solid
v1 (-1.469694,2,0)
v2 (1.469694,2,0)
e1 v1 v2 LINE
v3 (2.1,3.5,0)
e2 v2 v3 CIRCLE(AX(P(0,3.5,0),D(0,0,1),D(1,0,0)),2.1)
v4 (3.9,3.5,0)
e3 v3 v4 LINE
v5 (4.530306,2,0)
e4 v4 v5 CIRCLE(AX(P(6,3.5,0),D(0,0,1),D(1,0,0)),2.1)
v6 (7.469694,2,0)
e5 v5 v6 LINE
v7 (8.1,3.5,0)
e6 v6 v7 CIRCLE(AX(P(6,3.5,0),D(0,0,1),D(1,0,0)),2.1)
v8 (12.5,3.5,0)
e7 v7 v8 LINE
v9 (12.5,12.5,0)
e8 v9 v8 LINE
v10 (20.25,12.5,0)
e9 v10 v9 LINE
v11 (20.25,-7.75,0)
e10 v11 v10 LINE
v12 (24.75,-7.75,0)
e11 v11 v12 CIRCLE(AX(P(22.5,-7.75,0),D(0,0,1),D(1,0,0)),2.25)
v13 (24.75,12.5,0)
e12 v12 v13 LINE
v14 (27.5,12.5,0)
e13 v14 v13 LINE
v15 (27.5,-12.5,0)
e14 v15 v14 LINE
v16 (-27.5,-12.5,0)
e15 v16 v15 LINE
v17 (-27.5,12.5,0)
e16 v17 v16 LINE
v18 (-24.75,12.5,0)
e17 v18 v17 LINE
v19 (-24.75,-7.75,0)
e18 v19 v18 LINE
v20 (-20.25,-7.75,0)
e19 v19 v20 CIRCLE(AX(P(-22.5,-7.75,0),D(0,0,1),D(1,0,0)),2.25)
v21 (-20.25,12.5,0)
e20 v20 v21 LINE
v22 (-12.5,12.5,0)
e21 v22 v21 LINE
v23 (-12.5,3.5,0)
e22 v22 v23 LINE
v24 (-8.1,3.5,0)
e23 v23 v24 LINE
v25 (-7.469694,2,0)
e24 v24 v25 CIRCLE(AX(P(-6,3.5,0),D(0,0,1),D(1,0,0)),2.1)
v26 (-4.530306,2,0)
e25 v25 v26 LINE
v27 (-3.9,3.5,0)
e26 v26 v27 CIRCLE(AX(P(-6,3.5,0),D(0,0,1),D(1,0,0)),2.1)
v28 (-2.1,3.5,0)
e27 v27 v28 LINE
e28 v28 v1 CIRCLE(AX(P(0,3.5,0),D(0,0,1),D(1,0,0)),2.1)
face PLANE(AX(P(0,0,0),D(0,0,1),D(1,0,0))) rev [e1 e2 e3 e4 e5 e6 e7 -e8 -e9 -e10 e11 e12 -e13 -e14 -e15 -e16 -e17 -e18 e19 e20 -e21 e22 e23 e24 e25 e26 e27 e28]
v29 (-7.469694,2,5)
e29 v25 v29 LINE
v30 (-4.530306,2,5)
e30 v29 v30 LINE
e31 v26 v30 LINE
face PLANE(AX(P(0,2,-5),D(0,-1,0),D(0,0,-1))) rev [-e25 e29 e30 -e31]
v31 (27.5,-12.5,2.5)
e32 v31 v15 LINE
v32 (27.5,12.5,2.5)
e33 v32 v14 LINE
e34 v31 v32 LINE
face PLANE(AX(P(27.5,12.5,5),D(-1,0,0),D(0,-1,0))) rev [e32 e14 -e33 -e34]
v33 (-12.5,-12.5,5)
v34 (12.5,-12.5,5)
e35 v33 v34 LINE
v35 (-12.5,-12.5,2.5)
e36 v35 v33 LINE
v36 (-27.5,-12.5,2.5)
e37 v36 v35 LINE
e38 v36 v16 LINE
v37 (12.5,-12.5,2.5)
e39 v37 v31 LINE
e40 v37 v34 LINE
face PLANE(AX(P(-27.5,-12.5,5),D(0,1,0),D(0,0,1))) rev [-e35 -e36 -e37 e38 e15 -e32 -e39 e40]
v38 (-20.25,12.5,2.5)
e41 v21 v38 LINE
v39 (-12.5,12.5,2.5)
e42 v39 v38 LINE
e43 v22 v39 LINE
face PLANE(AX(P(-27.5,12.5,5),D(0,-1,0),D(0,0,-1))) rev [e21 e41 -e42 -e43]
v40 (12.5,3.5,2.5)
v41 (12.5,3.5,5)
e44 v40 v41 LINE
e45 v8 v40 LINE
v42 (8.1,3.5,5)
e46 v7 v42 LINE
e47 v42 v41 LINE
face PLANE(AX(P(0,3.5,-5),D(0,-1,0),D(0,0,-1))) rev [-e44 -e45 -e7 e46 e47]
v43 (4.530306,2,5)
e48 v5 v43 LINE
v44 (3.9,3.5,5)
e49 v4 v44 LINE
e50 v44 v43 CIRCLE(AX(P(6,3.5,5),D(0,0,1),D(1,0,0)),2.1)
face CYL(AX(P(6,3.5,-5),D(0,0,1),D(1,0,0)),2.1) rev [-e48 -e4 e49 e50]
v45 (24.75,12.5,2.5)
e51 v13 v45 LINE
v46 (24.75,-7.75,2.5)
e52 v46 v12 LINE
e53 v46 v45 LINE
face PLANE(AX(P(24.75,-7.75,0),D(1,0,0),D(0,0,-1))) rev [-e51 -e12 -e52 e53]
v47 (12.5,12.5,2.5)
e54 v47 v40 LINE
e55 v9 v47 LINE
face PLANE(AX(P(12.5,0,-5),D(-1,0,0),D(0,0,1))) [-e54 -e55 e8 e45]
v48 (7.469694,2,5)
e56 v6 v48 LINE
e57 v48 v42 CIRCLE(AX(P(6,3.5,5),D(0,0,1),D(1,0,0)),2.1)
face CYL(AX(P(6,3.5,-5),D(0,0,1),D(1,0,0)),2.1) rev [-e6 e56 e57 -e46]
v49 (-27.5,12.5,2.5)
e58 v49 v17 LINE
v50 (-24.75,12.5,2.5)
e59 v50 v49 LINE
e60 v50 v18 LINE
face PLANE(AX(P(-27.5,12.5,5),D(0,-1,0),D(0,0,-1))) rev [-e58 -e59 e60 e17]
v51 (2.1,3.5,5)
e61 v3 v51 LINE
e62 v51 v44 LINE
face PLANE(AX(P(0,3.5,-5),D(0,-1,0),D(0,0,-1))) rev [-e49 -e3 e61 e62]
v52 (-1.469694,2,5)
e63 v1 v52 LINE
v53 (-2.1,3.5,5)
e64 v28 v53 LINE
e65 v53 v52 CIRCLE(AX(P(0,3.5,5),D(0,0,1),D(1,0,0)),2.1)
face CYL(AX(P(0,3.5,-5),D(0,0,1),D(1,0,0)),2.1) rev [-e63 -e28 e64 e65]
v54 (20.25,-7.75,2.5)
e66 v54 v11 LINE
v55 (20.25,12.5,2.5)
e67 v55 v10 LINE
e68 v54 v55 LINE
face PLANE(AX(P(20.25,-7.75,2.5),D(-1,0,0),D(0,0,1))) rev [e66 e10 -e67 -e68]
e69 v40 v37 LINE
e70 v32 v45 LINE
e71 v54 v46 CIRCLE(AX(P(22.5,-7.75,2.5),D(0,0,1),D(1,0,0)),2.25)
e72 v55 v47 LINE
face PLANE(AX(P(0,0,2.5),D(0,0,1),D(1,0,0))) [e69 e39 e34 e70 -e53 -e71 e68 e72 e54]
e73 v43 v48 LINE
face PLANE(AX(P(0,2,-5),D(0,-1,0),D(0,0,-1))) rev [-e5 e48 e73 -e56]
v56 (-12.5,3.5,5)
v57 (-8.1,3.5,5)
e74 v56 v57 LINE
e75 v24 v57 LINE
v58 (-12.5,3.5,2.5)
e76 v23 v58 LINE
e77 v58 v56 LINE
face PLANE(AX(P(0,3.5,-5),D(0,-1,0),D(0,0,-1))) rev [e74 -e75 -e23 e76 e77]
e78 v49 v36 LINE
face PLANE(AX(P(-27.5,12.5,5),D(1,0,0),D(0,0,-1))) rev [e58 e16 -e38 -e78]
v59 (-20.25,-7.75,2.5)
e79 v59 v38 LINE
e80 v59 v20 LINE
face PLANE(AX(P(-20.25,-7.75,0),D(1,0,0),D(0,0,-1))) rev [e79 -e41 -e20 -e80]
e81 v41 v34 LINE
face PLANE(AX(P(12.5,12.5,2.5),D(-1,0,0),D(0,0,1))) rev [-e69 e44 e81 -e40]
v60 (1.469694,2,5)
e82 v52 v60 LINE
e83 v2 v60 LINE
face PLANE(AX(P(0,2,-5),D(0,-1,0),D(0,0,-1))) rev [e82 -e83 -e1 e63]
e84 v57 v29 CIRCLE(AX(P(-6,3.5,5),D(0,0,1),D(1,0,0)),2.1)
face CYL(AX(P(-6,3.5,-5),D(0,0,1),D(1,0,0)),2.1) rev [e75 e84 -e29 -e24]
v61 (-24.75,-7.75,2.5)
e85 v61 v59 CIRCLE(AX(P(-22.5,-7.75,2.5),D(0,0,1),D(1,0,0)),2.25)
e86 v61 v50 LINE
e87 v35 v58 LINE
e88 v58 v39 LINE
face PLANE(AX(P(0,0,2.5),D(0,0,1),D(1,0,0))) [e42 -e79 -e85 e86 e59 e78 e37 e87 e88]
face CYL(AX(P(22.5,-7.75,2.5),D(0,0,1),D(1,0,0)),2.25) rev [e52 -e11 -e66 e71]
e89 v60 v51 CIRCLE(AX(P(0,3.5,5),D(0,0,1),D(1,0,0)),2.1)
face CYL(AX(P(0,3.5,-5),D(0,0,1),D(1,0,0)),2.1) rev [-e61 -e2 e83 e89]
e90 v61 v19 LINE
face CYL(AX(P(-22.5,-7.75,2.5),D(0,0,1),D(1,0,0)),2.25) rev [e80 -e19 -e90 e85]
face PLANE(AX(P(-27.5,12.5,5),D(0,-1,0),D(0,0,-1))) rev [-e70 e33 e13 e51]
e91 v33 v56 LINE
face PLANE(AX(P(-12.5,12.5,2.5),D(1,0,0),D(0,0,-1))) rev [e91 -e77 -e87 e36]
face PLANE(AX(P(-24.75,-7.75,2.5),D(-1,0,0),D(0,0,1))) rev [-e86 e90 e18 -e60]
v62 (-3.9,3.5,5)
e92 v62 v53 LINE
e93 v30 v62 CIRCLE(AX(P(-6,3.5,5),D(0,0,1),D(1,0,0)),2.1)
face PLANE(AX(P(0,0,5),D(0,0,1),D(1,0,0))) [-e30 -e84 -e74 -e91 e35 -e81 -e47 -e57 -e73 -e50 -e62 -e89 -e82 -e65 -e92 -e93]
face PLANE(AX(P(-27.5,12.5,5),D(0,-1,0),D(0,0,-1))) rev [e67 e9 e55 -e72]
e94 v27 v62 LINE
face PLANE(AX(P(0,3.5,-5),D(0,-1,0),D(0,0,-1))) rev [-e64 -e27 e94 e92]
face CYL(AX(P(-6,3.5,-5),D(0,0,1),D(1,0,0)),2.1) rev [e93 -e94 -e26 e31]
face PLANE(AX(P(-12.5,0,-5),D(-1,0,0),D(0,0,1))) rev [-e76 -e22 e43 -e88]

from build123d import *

# Parameters (mm, degrees)
SKICA1_W                 = 55
SKICA1_H                 = 25
P_IDAT_VYSUNUT_M1_DEPTH  = 5
ODEBRAT_VYSUNUT_M1_DEPTH = 10
SKICA3_W                 = 15
SKICA3_H                 = 25
ODEBRAT_VYSUNUT_M2_DEPTH = 2.5
M4_D_RA_S_V_L_4_DEPTH    = 2.5


# Read off the part's stored shape, not the designer's step: M4 díra s vůlí4
with BuildPart() as part:
    # Skica1 → Přidat vysunutím1 (new body)
    with BuildSketch(Plane.XY):
        Rectangle(SKICA1_W, SKICA1_H)
    extrude(amount=P_IDAT_VYSUNUT_M1_DEPTH)

    # Skica2 → Odebrat vysunutím1 (cut)
    with BuildSketch(Plane.XY.offset(5)):
        with BuildLine():
            Line((-12.5, 3.5), (-8.1, 3.5))
            ThreePointArc((-8.1, 3.5), (-7.936021317, 2.6864759), (-7.469693846, 2))
            Line((-7.469693846, 2), (-4.530306154, 2))
            ThreePointArc((-4.530306154, 2), (-4.063978683, 2.6864759), (-3.9, 3.5))
            Line((-3.9, 3.5), (-2.1, 3.5))
            ThreePointArc((-2.1, 3.5), (-1.936021317, 2.6864759), (-1.469693846, 2))
            Line((-1.469693846, 2), (1.469693846, 2))
            ThreePointArc((1.469693846, 2), (1.936021317, 2.6864759), (2.1, 3.5))
            Line((2.1, 3.5), (3.9, 3.5))
            ThreePointArc((3.9, 3.5), (4.063978683, 2.6864759), (4.530306154, 2))
            Line((4.530306154, 2), (7.469693846, 2))
            ThreePointArc((7.469693846, 2), (7.936021317, 2.6864759), (8.1, 3.5))
            Line((8.1, 3.5), (12.5, 3.5))
            Line((12.5, 3.5), (12.5, 12.5))
            Line((12.5, 12.5), (-12.5, 12.5))
            Line((-12.5, 12.5), (-12.5, 3.5))
        make_face()
    extrude(amount=-ODEBRAT_VYSUNUT_M1_DEPTH, mode=Mode.SUBTRACT)

    # Skica3 → Odebrat vysunutím2 (cut)
    with BuildSketch(Plane.XY.offset(5)):
        with Locations((-20, 0)):
            Rectangle(SKICA3_W, SKICA3_H)
        with Locations((20, 0)):
            Rectangle(SKICA3_W, SKICA3_H)
    extrude(amount=-ODEBRAT_VYSUNUT_M2_DEPTH, mode=Mode.SUBTRACT)

    # M4 díra s vůlí4 outline → M4 díra s vůlí4 (cut)
    with BuildSketch(Plane.XY):
        with BuildLine():
            Line((-20.25, 12.5), (-24.75, 12.5))
            Line((-24.75, 12.5), (-24.75, -7.75))
            ThreePointArc((-24.75, -7.75), (-22.5, -10), (-20.25, -7.75))
            Line((-20.25, -7.75), (-20.25, 12.5))
        make_face()
        with BuildLine():
            Line((24.75, 12.5), (20.25, 12.5))
            Line((20.25, 12.5), (20.25, -7.75))
            ThreePointArc((20.25, -7.75), (22.5, -10), (24.75, -7.75))
            Line((24.75, -7.75), (24.75, 12.5))
        make_face()
    extrude(amount=M4_D_RA_S_V_L_4_DEPTH, mode=Mode.SUBTRACT)


solid = part.part
